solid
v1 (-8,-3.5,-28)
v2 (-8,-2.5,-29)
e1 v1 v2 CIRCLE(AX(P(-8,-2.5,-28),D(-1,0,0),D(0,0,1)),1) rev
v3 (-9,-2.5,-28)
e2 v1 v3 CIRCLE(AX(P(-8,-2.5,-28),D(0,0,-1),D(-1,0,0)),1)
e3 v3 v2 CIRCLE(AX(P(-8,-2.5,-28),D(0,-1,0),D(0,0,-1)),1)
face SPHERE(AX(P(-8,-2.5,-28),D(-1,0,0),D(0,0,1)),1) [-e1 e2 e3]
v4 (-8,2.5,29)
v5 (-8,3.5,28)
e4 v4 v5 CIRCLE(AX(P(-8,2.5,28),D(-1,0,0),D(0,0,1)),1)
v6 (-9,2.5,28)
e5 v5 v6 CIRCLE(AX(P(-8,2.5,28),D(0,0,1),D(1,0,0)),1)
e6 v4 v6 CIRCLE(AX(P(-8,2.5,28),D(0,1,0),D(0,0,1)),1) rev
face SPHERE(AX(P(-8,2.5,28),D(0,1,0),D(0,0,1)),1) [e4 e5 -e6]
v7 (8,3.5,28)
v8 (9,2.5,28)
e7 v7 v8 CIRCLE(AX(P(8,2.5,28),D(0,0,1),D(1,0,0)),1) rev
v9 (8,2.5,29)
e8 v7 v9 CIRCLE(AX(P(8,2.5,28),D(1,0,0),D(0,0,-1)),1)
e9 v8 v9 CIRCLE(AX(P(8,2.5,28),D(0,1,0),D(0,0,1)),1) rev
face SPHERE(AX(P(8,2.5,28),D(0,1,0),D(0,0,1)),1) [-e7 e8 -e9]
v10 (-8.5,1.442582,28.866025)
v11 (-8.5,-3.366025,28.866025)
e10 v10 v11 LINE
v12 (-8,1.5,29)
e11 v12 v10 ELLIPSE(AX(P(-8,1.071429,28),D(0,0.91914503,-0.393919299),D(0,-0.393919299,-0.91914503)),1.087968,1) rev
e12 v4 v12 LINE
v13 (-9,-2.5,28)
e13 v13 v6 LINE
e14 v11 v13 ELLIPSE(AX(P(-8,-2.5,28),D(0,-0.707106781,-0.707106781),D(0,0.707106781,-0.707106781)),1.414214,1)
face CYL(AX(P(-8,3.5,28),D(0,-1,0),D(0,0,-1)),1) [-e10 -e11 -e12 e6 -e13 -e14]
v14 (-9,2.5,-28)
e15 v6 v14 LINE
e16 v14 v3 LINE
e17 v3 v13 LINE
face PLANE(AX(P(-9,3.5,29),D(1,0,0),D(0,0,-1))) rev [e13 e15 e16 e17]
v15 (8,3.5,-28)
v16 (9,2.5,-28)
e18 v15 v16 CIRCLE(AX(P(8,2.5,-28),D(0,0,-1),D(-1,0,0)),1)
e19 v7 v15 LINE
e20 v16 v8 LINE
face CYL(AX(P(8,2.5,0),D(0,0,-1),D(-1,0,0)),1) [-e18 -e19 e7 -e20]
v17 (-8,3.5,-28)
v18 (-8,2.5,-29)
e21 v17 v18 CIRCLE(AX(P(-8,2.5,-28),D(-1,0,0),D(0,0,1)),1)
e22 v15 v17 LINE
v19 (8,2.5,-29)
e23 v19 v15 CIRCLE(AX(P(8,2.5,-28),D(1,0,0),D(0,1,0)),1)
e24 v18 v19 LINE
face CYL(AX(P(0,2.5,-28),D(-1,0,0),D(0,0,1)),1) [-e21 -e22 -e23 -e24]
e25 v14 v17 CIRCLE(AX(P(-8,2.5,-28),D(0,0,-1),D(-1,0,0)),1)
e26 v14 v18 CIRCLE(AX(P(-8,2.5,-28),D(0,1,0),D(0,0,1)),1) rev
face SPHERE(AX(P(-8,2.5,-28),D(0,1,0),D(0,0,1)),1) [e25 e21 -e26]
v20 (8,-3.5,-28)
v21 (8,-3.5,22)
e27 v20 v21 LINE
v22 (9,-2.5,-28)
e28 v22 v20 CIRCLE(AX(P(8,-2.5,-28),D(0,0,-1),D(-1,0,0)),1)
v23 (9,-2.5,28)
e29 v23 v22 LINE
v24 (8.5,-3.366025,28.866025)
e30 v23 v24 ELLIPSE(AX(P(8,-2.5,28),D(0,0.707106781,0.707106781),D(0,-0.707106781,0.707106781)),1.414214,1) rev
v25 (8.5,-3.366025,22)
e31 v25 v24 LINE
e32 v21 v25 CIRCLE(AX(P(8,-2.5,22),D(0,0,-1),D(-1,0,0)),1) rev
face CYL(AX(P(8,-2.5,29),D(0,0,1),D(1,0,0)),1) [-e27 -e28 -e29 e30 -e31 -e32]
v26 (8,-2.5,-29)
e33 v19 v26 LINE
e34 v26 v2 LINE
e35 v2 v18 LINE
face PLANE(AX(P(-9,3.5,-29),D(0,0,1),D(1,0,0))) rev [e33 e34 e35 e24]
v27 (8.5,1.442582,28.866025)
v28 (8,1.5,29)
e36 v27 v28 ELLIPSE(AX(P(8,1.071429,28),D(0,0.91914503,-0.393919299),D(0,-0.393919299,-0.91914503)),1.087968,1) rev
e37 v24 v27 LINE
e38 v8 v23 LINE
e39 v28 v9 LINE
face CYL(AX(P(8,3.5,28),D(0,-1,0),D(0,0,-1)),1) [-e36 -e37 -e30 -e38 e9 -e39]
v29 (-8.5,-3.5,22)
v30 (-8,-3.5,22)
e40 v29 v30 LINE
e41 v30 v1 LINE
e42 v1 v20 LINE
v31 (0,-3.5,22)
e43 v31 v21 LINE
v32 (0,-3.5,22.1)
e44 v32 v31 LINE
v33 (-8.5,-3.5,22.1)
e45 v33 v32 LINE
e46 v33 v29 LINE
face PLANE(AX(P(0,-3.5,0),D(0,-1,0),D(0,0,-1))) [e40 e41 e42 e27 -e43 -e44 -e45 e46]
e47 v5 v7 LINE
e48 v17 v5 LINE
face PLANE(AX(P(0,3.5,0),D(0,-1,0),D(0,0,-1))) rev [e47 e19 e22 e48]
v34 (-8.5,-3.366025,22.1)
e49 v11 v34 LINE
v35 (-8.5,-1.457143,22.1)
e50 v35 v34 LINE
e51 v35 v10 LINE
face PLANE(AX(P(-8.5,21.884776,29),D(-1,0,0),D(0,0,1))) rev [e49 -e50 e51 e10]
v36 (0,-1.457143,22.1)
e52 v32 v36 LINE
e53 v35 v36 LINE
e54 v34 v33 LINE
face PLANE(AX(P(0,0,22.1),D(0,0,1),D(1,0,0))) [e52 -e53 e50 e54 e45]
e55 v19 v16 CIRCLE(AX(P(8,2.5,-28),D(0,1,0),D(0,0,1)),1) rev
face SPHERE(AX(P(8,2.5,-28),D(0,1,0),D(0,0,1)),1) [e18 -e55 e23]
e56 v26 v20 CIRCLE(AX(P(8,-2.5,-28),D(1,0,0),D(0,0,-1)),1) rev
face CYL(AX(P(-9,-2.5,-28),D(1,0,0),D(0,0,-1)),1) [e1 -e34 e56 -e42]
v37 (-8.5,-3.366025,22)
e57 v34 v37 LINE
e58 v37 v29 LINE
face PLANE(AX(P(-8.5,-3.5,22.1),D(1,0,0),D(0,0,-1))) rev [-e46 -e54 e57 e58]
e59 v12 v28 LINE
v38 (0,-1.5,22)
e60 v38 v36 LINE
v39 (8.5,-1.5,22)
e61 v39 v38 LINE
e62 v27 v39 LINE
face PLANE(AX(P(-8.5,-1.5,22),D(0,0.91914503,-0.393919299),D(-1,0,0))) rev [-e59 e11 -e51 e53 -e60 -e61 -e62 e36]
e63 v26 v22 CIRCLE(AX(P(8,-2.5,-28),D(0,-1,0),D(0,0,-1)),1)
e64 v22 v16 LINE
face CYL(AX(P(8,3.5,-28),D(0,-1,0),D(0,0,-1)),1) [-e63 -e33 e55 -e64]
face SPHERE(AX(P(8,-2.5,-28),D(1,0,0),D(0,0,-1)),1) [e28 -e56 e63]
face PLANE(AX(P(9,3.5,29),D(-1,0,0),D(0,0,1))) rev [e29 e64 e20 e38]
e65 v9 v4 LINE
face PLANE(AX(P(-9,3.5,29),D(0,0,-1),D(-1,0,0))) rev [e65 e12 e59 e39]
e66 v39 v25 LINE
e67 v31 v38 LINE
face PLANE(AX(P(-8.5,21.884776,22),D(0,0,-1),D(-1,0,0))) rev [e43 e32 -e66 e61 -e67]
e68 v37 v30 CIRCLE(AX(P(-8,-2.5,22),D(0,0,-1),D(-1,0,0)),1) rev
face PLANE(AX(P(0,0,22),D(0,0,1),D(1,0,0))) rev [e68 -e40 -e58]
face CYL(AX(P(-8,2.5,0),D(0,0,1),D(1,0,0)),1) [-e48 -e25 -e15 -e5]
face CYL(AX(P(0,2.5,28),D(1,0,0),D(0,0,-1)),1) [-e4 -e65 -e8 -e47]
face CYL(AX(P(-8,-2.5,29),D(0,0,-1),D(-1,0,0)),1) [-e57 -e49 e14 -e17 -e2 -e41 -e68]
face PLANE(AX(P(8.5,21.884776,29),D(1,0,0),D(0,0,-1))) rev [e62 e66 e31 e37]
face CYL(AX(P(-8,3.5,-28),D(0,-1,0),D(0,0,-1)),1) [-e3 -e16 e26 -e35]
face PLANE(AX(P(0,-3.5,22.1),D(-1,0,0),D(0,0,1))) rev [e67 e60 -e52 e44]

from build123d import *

# Parameters (mm, degrees)
SKETCH1_W           = 18
SKETCH1_H           = 58
BOSS_EXTRUDE1_DEPTH = 3.5
SKETCH2_W           = 17
SKETCH2_H           = 7
CUT_EXTRUDE1_DEPTH  = 5
CHAMFER1_SIZE2      = 3
CHAMFER1_SIZE       = 7
FILLET2_R           = 1
SKETCH3_W           = 8.5
SKETCH3_H           = 3.471291158
BOSS_EXTRUDE2_DEPTH = 0.1


# Some blends are built 0.0001 mm under size
with BuildPart() as part:
    # Sketch1 → Boss-Extrude1 (new, symmetric)
    with BuildSketch(Plane(origin=(0, 0, 0), x_dir=(1, 0, 0), z_dir=(0, 1, 0))):
        Rectangle(SKETCH1_W, SKETCH1_H)
    extrude(amount=BOSS_EXTRUDE1_DEPTH, both=True)

    # Sketch2 → Cut-Extrude1 (cut)
    with BuildSketch(Plane.XZ.offset(3.5)):
        with Locations((0, 25.5)):
            Rectangle(SKETCH2_W, SKETCH2_H)
    extrude(amount=-CUT_EXTRUDE1_DEPTH, mode=Mode.SUBTRACT)

    # Chamfer1
    chamfer1_edges = [part.edges().sort_by_distance(p)[0] for p in [
        (0, 1.5, 22),
    ]]
    chamfer1_side = [part.faces().sort_by_distance(p)[0] for p in [
        (0, 1.5, 22.06),
    ]]
    chamfer(chamfer1_edges, length=CHAMFER1_SIZE - 0.0001, length2=CHAMFER1_SIZE2 - 0.0001, reference=chamfer1_side[0])  # a hair under: the kernel refuses the full size

    # Fillet2
    # the kernel refuses this fillet: 1 mm, written as the material it takes off along each edge
    with BuildSketch(Plane(origin=(8, -2.5, -28), x_dir=(1, 0, 0), z_dir=(0, 0, -1))) as fillet2_piece_1_section:
        Polygon((0, 0), (FILLET2_R, 0), (FILLET2_R, FILLET2_R), (0, FILLET2_R), align=None)
    fillet2_piece_1 = extrude(amount=FILLET2_R, mode=Mode.PRIVATE)
    fillet2_piece_1 = fillet2_piece_1 - Plane(origin=(8, -2.5, -28), x_dir=(-0.7071067811865475, 0.7071067811865475, 0), z_dir=(0, 0, -1)) * Sphere(FILLET2_R, mode=Mode.PRIVATE)
    add(fillet2_piece_1, mode=Mode.SUBTRACT)
    with BuildSketch(Plane(origin=(-8, -2.5, -28), x_dir=(0, -1, 0), z_dir=(0, 0, -1))) as fillet2_piece_2_section:
        Polygon((0, 0), (FILLET2_R, 0), (FILLET2_R, FILLET2_R), (0, FILLET2_R), align=None)
    fillet2_piece_2 = extrude(amount=FILLET2_R, mode=Mode.PRIVATE)
    fillet2_piece_2 = fillet2_piece_2 - Plane(origin=(-8, -2.5, -28), x_dir=(0.7071067811865475, 0.7071067811865475, 0), z_dir=(0, 0, -1)) * Sphere(FILLET2_R, mode=Mode.PRIVATE)
    add(fillet2_piece_2, mode=Mode.SUBTRACT)
    with BuildSketch(Plane(origin=(-8, 2.5, -28), x_dir=(0, 1, 0), z_dir=(0, 0, -1))) as fillet2_piece_3_section:
        Polygon((0, 0), (FILLET2_R, 0), (FILLET2_R, -FILLET2_R), (0, -FILLET2_R), align=None)
    fillet2_piece_3 = extrude(amount=FILLET2_R, mode=Mode.PRIVATE)
    fillet2_piece_3 = fillet2_piece_3 - Plane(origin=(-8, 2.5, -28), x_dir=(0.7071067811865475, -0.7071067811865475, 0), z_dir=(0, 0, -1)) * Sphere(FILLET2_R, mode=Mode.PRIVATE)
    add(fillet2_piece_3, mode=Mode.SUBTRACT)
    with BuildSketch(Plane(origin=(8, 2.5, -28), x_dir=(1, 0, 0), z_dir=(0, 0, -1))) as fillet2_piece_4_section:
        Polygon((0, 0), (FILLET2_R, 0), (FILLET2_R, -FILLET2_R), (0, -FILLET2_R), align=None)
    fillet2_piece_4 = extrude(amount=FILLET2_R, mode=Mode.PRIVATE)
    fillet2_piece_4 = fillet2_piece_4 - Plane(origin=(8, 2.5, -28), x_dir=(-0.7071067811865475, -0.7071067811865475, 0), z_dir=(0, 0, -1)) * Sphere(FILLET2_R, mode=Mode.PRIVATE)
    add(fillet2_piece_4, mode=Mode.SUBTRACT)
    with BuildSketch(Plane(origin=(-8, 2.5, 28), x_dir=(0, 0, 1), z_dir=(0, 1, 0))) as fillet2_piece_5_section:
        Polygon((0, 0), (FILLET2_R, 0), (FILLET2_R, -FILLET2_R), (0, -FILLET2_R), align=None)
    fillet2_piece_5 = extrude(amount=FILLET2_R, mode=Mode.PRIVATE)
    fillet2_piece_5 = fillet2_piece_5 - Plane(origin=(-8, 2.5, 28), x_dir=(0.7071067811865475, 0, -0.7071067811865475), z_dir=(0, 1, 0)) * Sphere(FILLET2_R, mode=Mode.PRIVATE)
    add(fillet2_piece_5, mode=Mode.SUBTRACT)
    with BuildSketch(Plane(origin=(8, 2.5, 28), x_dir=(0, 1, 0), z_dir=(1, 0, 0))) as fillet2_piece_6_section:
        Polygon((0, 0), (FILLET2_R, 0), (FILLET2_R, FILLET2_R), (0, FILLET2_R), align=None)
    fillet2_piece_6 = extrude(amount=FILLET2_R, mode=Mode.PRIVATE)
    fillet2_piece_6 = fillet2_piece_6 - Plane(origin=(8, 2.5, 28), x_dir=(0, -0.7071067811865475, -0.7071067811865475), z_dir=(1, 0, 0)) * Sphere(FILLET2_R, mode=Mode.PRIVATE)
    add(fillet2_piece_6, mode=Mode.SUBTRACT)
    with BuildSketch(Plane(origin=(8, -3.5, -29), x_dir=(0, 0, 1), z_dir=(-1, 0, 0)), Plane(origin=(8, 3.5, -29), x_dir=(0, -1, 0), z_dir=(-1, 0, 0)), Plane(origin=(-8, 3.5, 29), x_dir=(0, -1, 0), z_dir=(1, 0, 0))) as fillet2_piece_7:
        with BuildLine():
            CenterArc((FILLET2_R, FILLET2_R), FILLET2_R, 180, 90)
            Line((0, FILLET2_R), (0, 0))
            Line((0, 0), (FILLET2_R, 0))
        make_face()
    extrude(amount=16, mode=Mode.SUBTRACT)
    with BuildSketch(Plane(origin=(-9, 2.5, -29), x_dir=(0, 0, 1), z_dir=(0, -1, 0))) as fillet2_piece_8:
        with BuildLine():
            CenterArc((FILLET2_R, -FILLET2_R), FILLET2_R, 90, 90)
            Line((0, -FILLET2_R), (0, 0))
            Line((0, 0), (FILLET2_R, 0))
        make_face()
    extrude(amount=5, mode=Mode.SUBTRACT)
    with BuildSketch(Plane(origin=(-9, -3.5, -28), x_dir=(1, 0, 0), z_dir=(0, 0, 1)), Plane(origin=(9, -3.5, 31.5), x_dir=(-1, 0, 0), z_dir=(0, 0, -1))) as fillet2_piece_9:
        with BuildLine():
            CenterArc((FILLET2_R, FILLET2_R), FILLET2_R, 180, 90)
            Line((0, FILLET2_R), (0, 0))
            Line((0, 0), (FILLET2_R, 0))
        make_face()
    extrude(amount=59.5, mode=Mode.SUBTRACT)
    with BuildSketch(Plane(origin=(-9, 3.5, -28), x_dir=(0, -1, 0), z_dir=(0, 0, 1)), Plane(origin=(9, 3.5, 28), x_dir=(0, -1, 0), z_dir=(0, 0, -1))) as fillet2_piece_10:
        with BuildLine():
            CenterArc((FILLET2_R, FILLET2_R), FILLET2_R, 180, 90)
            Line((0, FILLET2_R), (0, 0))
            Line((0, 0), (FILLET2_R, 0))
        make_face()
    extrude(amount=56, mode=Mode.SUBTRACT)
    with BuildSketch(Plane(origin=(9, -2.5, -29), x_dir=(-1, 0, 0), z_dir=(0, 1, 0))) as fillet2_piece_11:
        with BuildLine():
            CenterArc((FILLET2_R, FILLET2_R), FILLET2_R, 180, 90)
            Line((0, FILLET2_R), (0, 0))
            Line((0, 0), (FILLET2_R, 0))
        make_face()
    extrude(amount=5, mode=Mode.SUBTRACT)
    with BuildSketch(Plane(origin=(-9, 2.5, 29), x_dir=(1, 0, 0), z_dir=(0, -1, 0)), Plane(origin=(9, -6, 29), x_dir=(-1, 0, 0), z_dir=(0, 1, 0))) as fillet2_piece_12:
        with BuildLine():
            CenterArc((FILLET2_R, -FILLET2_R), FILLET2_R, 90, 90)
            Line((0, -FILLET2_R), (0, 0))
            Line((0, 0), (FILLET2_R, 0))
        make_face()
    extrude(amount=8.5, mode=Mode.SUBTRACT)

    # Sketch3 → Boss-Extrude2 (add)
    with BuildSketch(Plane.XY.offset(22)):
        with Locations((-4.25, -1.764354421)):
            Rectangle(SKETCH3_W, SKETCH3_H)
    extrude(amount=BOSS_EXTRUDE2_DEPTH)


solid = part.part
